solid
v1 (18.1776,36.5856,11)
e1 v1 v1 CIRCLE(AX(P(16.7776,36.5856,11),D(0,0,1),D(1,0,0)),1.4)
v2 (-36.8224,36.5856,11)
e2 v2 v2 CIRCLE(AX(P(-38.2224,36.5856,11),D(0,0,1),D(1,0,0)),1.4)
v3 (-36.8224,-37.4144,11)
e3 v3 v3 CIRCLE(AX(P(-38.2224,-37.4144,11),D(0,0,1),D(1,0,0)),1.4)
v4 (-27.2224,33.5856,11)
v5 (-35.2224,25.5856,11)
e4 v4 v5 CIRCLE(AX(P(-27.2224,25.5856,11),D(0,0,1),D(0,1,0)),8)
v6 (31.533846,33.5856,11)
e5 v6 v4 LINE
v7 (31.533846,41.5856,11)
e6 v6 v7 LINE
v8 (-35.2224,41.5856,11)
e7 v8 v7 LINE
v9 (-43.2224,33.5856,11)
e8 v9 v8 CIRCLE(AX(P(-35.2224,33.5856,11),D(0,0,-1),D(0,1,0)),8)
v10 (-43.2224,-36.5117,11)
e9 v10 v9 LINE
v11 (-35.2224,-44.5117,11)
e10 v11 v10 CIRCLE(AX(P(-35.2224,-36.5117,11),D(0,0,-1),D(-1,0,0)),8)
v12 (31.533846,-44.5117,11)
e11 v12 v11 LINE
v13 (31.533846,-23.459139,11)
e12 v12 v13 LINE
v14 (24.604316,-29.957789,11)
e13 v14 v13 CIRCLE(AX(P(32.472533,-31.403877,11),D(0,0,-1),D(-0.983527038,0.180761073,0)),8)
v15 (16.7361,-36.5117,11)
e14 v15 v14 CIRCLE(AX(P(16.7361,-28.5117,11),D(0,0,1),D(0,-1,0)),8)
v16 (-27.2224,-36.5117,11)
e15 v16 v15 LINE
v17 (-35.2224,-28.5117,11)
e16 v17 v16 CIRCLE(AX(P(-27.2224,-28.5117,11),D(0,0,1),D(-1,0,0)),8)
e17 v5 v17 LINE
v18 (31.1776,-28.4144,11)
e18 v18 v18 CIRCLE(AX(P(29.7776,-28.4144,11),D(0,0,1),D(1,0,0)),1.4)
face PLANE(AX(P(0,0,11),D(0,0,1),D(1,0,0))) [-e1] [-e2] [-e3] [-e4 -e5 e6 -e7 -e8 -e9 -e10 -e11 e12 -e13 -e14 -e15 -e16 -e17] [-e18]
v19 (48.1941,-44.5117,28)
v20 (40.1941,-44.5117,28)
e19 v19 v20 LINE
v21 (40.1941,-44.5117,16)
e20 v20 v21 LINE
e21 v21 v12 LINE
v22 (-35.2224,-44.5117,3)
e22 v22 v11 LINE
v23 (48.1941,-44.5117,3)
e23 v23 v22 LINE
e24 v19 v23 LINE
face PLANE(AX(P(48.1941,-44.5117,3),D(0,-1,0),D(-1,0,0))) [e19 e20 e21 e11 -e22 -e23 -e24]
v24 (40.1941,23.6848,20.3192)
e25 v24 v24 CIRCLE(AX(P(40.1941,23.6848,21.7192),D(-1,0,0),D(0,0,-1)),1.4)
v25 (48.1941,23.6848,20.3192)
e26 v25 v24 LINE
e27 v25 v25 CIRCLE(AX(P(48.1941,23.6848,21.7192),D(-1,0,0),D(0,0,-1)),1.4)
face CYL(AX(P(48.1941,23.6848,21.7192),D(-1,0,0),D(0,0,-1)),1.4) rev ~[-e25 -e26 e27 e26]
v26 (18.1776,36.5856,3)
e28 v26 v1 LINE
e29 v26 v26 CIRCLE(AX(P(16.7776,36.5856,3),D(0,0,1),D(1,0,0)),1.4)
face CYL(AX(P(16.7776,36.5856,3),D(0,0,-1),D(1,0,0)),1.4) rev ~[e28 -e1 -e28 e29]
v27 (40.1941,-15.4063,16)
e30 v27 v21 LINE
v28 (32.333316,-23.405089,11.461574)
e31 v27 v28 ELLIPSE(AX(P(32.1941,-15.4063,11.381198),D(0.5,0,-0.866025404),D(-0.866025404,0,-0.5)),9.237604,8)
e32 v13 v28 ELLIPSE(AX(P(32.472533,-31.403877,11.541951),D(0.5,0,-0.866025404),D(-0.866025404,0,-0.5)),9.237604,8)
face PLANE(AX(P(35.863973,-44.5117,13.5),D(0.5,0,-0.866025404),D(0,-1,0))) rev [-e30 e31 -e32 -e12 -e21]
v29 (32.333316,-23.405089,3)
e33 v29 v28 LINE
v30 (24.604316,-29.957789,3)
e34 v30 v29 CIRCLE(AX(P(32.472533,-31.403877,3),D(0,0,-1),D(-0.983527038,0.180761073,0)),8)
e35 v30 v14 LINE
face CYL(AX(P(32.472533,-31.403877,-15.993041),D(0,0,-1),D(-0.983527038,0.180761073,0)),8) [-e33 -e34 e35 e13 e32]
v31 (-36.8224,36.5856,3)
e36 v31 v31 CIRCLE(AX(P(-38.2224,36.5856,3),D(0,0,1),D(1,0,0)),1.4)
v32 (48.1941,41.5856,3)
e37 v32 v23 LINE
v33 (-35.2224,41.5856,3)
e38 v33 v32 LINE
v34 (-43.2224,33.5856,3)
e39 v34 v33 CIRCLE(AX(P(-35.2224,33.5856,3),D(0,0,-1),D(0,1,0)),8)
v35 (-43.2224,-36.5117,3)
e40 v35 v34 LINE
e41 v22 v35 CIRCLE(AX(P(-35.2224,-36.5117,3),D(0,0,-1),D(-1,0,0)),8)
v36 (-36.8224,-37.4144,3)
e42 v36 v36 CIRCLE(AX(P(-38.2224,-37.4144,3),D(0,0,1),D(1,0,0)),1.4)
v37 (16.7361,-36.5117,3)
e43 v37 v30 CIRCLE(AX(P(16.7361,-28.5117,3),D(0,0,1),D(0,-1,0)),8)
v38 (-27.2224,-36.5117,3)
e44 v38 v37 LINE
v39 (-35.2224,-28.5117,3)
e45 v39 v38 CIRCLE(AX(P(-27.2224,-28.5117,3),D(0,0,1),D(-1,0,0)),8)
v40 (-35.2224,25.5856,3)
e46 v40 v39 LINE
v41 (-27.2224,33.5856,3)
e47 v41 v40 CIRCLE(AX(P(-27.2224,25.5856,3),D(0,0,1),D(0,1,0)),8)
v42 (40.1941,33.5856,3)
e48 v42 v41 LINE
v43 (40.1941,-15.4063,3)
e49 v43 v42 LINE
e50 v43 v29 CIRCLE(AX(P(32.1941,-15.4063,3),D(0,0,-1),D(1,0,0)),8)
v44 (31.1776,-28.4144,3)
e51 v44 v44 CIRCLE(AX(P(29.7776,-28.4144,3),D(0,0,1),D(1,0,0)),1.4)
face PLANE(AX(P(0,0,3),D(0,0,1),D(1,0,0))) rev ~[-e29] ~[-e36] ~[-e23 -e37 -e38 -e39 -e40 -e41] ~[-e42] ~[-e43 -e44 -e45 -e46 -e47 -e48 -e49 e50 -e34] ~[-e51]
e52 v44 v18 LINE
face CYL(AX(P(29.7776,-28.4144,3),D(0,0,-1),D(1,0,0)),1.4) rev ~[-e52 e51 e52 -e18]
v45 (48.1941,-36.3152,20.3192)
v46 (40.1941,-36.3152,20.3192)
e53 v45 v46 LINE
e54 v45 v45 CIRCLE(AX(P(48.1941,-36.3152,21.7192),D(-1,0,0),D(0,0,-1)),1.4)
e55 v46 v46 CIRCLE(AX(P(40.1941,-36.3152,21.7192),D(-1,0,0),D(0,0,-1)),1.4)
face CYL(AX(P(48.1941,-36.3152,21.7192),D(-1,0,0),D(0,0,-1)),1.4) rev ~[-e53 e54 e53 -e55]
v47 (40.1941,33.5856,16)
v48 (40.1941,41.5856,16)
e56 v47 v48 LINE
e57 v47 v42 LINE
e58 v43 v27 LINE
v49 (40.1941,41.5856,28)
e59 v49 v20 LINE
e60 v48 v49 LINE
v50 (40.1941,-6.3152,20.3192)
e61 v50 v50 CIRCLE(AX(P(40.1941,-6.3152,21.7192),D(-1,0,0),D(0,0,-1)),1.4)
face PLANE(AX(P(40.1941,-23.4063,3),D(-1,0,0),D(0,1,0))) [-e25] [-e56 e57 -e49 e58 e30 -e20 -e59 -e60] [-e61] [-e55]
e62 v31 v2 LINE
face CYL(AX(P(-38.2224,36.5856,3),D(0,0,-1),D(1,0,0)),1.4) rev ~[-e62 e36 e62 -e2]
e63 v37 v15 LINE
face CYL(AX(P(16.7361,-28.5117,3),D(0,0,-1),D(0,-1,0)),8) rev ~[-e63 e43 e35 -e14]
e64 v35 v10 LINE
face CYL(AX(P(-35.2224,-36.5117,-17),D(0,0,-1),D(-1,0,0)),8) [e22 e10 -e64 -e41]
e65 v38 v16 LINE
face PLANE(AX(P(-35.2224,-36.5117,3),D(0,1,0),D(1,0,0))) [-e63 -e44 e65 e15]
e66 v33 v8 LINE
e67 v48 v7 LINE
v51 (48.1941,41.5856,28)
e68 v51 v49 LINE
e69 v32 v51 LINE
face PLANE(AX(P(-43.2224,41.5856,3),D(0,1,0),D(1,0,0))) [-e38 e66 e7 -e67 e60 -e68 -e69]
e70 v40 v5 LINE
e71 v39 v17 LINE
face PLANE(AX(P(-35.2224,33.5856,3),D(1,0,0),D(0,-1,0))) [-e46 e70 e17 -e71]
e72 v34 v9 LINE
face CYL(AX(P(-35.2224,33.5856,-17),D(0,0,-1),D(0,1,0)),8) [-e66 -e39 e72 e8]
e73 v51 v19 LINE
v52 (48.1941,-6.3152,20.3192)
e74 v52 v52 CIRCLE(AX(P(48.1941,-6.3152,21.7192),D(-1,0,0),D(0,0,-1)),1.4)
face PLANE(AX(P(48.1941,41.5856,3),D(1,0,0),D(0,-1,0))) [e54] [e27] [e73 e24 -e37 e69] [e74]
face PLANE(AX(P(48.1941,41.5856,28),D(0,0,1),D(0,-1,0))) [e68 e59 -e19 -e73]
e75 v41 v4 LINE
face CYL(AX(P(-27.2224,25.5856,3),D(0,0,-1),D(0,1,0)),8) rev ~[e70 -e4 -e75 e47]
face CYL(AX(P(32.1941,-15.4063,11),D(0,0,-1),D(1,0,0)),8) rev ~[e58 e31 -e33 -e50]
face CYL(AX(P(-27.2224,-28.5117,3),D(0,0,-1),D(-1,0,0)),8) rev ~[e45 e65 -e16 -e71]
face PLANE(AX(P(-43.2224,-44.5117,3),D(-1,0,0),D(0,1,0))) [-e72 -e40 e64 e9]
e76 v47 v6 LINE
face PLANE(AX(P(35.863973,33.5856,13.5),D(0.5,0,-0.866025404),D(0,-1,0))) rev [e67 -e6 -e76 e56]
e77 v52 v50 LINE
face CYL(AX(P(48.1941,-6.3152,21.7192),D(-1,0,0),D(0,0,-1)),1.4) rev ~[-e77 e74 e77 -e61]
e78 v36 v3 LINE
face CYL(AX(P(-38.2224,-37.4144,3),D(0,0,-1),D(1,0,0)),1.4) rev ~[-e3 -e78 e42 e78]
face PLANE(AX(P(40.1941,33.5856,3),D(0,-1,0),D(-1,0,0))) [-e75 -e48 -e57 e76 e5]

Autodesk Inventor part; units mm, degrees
ref_plane "YZ Plane" through (0, 0, 0) normal (1, 0, 0) x (0, 1, 0)
ref_plane "XZ Plane" through (0, 0, 0) normal (0, 1, 0) x (-1, 0, 0)
ref_plane "XY Plane" through (0, 0, 0) normal (0, 0, 1) x (1, 0, 0)
ref_plane "Arbeitsebene1" through (0, 0, 3) normal (0, 0, 1) x (1, 0, 0)
sketch "Skizze1" plane through (0, 0, 3) normal (0, 0, 1) x (1, 0, 0)
  line L0 (43.1941, -41.5994) -> (-43.1659, -41.5994) construction
  line L1 (43.1941, 41.5856) -> (43.1941, -41.5994) construction
  line L2 (-43.2224, 41.5856) -> (43.1941, 41.5856) construction
  line L3 (-43.1659, -41.5994) -> (-43.2224, 41.5856) construction
  circle A0 centre (37.6276, -35.8844) radius 0.5 construction
  circle A1 centre (35.0876, -35.8844) radius 0.5 construction
  circle A2 centre (32.5476, -35.8844) radius 0.5 construction
  circle A3 centre (36.8476, -29.7044) radius 0.5 construction
  circle A4 centre (25.8376, -35.8644) radius 0.5 construction
  circle A5 centre (23.2976, -35.8644) radius 0.5 construction
  circle A6 centre (20.7576, -35.8644) radius 0.5 construction
  circle A7 centre (36.8476, -27.1644) radius 0.5 construction
  circle A8 centre (36.8476, -24.6244) radius 0.5 construction
  circle A9 centre (29.7776, -28.4144) radius 1.6 construction
  circle A10 centre (36.8976, -19.8144) radius 0.5 construction
  circle A11 centre (29.8161, -22.9044) radius 0.5 construction
  circle A12 centre (27.2761, -22.9044) radius 0.5 construction
  circle A13 centre (24.7361, -22.9044) radius 0.5 construction
  circle A14 centre (22.1961, -22.9044) radius 0.5 construction
  circle A15 centre (19.6561, -22.9044) radius 0.5 construction
  circle A16 centre (13.8076, -35.7944) radius 0.5 construction
  circle A17 centre (11.2676, -35.7944) radius 0.5 construction
  circle A18 centre (8.7276, -35.7944) radius 0.5 construction
  circle A19 centre (1.7376, -35.7544) radius 0.5 construction
  circle A20 centre (-0.8024, -35.7544) radius 0.5 construction
  circle A21 centre (18.2361, -29.1444) radius 0.5 construction
  circle A22 centre (18.2361, -26.6044) radius 0.5 construction
  circle A23 centre (10.7361, -29.1444) radius 0.5 construction
  circle A24 centre (10.7361, -26.6044) radius 0.5 construction
  circle A25 centre (17.1161, -22.9044) radius 0.5 construction
  circle A26 centre (14.5761, -22.9044) radius 0.5 construction
  circle A27 centre (12.0361, -22.9044) radius 0.5 construction
  circle A28 centre (9.4961, -22.9044) radius 0.5 construction
  circle A29 centre (3.2361, -29.1444) radius 0.5 construction
  circle A30 centre (3.2361, -26.6044) radius 0.5 construction
  circle A31 centre (6.9561, -22.9044) radius 0.5 construction
  circle A32 centre (1.1961, -20.0044) radius 0.5 construction
  circle A33 centre (36.8976, -17.2744) radius 0.5 construction
  circle A34 centre (36.8976, -14.7344) radius 0.5 construction
  circle A35 centre (36.9476, -8.9644) radius 0.5 construction
  circle A36 centre (36.9476, -6.4244) radius 0.5 construction
  circle A37 centre (30.7111, -6.3544) radius 0.5 construction
  circle A38 centre (36.9476, -3.8844) radius 0.5 construction
  circle A39 centre (30.7111, -3.8144) radius 0.5 construction
  circle A40 centre (30.7111, -1.2744) radius 0.5 construction
  circle A41 centre (5.3111, -6.3544) radius 0.5 construction
  circle A42 centre (5.3111, -3.8144) radius 0.5 construction
  circle A43 centre (5.3111, -1.2744) radius 0.5 construction
  circle A44 centre (-3.3424, -35.7544) radius 0.5 construction
  circle A45 centre (-8.1789, -38.8044) radius 0.5 construction
  circle A46 centre (-8.1789, -35.1044) radius 0.5 construction
  circle A47 centre (-8.1789, -31.4044) radius 0.5 construction
  circle A48 centre (-10.7189, -38.8044) radius 0.5 construction
  circle A49 centre (-10.7189, -35.1044) radius 0.5 construction
  circle A50 centre (-14.5659, -33.6344) radius 0.5 construction
  circle A51 centre (-10.7189, -31.4044) radius 0.5 construction
  circle A52 centre (-17.1059, -33.6344) radius 0.5 construction
  circle A53 centre (-19.6459, -33.6344) radius 0.5 construction
  circle A54 centre (-1.3439, -27.2044) radius 0.5 construction
  circle A55 centre (-3.8839, -27.2044) radius 0.5 construction
  circle A56 centre (-6.4239, -27.2044) radius 0.5 construction
  circle A57 centre (-8.9639, -27.2044) radius 0.5 construction
  circle A58 centre (-1.3439, -23.6044) radius 0.5 construction
  circle A59 centre (-3.8839, -23.6044) radius 0.5 construction
  circle A60 centre (-1.3439, -20.0044) radius 0.5 construction
  circle A61 centre (-3.8839, -20.0044) radius 0.5 construction
  circle A62 centre (-6.4239, -23.6044) radius 0.5 construction
  circle A63 centre (-8.9639, -23.6044) radius 0.5 construction
  circle A64 centre (-6.4239, -20.0044) radius 0.5 construction
  circle A65 centre (-8.9639, -20.0044) radius 0.5 construction
  circle A66 centre (-14.5659, -20.9344) radius 0.5 construction
  circle A67 centre (-17.1059, -20.9344) radius 0.5 construction
  circle A68 centre (-19.6459, -20.9344) radius 0.5 construction
  circle A69 centre (-22.1859, -33.6344) radius 0.5 construction
  circle A70 centre (-24.7259, -33.6344) radius 0.5 construction
  circle A71 centre (-27.2659, -33.6344) radius 0.5 construction
  circle A72 centre (-29.8059, -33.6344) radius 0.5 construction
  circle A73 centre (-38.2224, -37.4144) radius 1.6 construction
  circle A74 centre (-32.3459, -33.6344) radius 0.5 construction
  circle A75 centre (-38.3399, -30.1694) radius 0.5 construction
  circle A76 centre (-22.1859, -20.9344) radius 0.5 construction
  circle A77 centre (-24.7259, -20.9344) radius 0.5 construction
  circle A78 centre (-27.2659, -20.9344) radius 0.5 construction
  circle A79 centre (-29.8059, -20.9344) radius 0.5 construction
  circle A80 centre (-38.3399, -27.6294) radius 0.5 construction
  circle A81 centre (-38.3399, -25.0894) radius 0.5 construction
  circle A82 centre (-32.3459, -20.9344) radius 0.5 construction
  circle A83 centre (-38.3399, -22.5494) radius 0.5 construction
  circle A84 centre (-2.2639, -15.2044) radius 0.375 construction
  circle A85 centre (-4.2639, -15.2044) radius 0.375 construction
  circle A86 centre (-6.2639, -15.2044) radius 0.375 construction
  circle A87 centre (-8.2639, -15.2044) radius 0.375 construction
  circle A88 centre (-2.2639, -9.7044) radius 0.375 construction
  circle A89 centre (-4.2639, -9.7044) radius 0.375 construction
  circle A90 centre (-6.2639, -9.7044) radius 0.375 construction
  circle A91 centre (-8.2639, -9.7044) radius 0.375 construction
  circle A92 centre (-14.5659, -15.6344) radius 0.5 construction
  circle A93 centre (-17.1059, -15.6344) radius 0.5 construction
  circle A94 centre (-19.6459, -15.6344) radius 0.5 construction
  circle A95 centre (-2.2639, -4.2044) radius 0.375 construction
  circle A96 centre (-4.2639, -4.2044) radius 0.375 construction
  circle A97 centre (-6.2639, -4.2044) radius 0.375 construction
  circle A98 centre (-8.2639, -4.2044) radius 0.375 construction
  circle A99 centre (-14.5659, -2.9344) radius 0.5 construction
  circle A100 centre (-17.1059, -2.9344) radius 0.5 construction
  circle A101 centre (-19.6459, -2.9344) radius 0.5 construction
  circle A102 centre (-22.1859, -15.6344) radius 0.5 construction
  circle A103 centre (-24.7259, -15.6344) radius 0.5 construction
  circle A104 centre (-27.2659, -15.6344) radius 0.5 construction
  circle A105 centre (-29.8059, -15.6344) radius 0.5 construction
  circle A106 centre (-32.3459, -15.6344) radius 0.5 construction
  circle A107 centre (-38.4669, -13.2784) radius 0.5 construction
  circle A108 centre (-38.4669, -10.7384) radius 0.5 construction
  circle A109 centre (-22.1859, -2.9344) radius 0.5 construction
  circle A110 centre (-24.7259, -2.9344) radius 0.5 construction
  circle A111 centre (-27.2659, -2.9344) radius 0.5 construction
  circle A112 centre (-29.8059, -2.9344) radius 0.5 construction
  circle A113 centre (-38.4669, -8.1984) radius 0.5 construction
  circle A114 centre (-38.4669, -5.6584) radius 0.5 construction
  circle A115 centre (-32.3459, -2.9344) radius 0.5 construction
  circle A116 centre (36.9476, 0.6556) radius 0.5 construction
  circle A117 centre (36.9476, 3.1956) radius 0.5 construction
  circle A118 centre (30.7111, 1.2656) radius 0.5 construction
  circle A119 centre (30.7111, 3.8056) radius 0.5 construction
  circle A120 centre (36.9476, 5.7356) radius 0.5 construction
  circle A121 centre (30.7111, 6.3456) radius 0.5 construction
  circle A122 centre (30.7111, 8.8856) radius 0.5 construction
  circle A123 centre (36.9976, 10.7656) radius 0.5 construction
  circle A124 centre (36.9976, 13.3056) radius 0.5 construction
  circle A125 centre (30.7111, 11.4256) radius 0.5 construction
  circle A126 centre (30.7111, 13.9656) radius 0.5 construction
  circle A127 centre (36.9976, 15.8456) radius 0.5 construction
  circle A128 centre (30.7111, 16.5056) radius 0.5 construction
  circle A129 centre (30.7111, 19.0456) radius 0.5 construction
  circle A130 centre (5.3111, 1.2656) radius 0.5 construction
  circle A131 centre (5.3111, 3.8056) radius 0.5 construction
  circle A132 centre (5.3111, 6.3456) radius 0.5 construction
  circle A133 centre (5.3111, 8.8856) radius 0.5 construction
  circle A134 centre (5.3111, 11.4256) radius 0.5 construction
  circle A135 centre (5.3111, 13.9656) radius 0.5 construction
  circle A136 centre (5.3111, 16.5056) radius 0.5 construction
  circle A137 centre (5.3111, 19.0456) radius 0.5 construction
  circle A138 centre (36.9476, 20.9456) radius 0.5 construction
  circle A139 centre (36.9476, 23.4856) radius 0.5 construction
  circle A140 centre (30.7111, 21.5856) radius 0.5 construction
  circle A141 centre (30.7111, 24.1256) radius 0.5 construction
  circle A142 centre (36.9476, 26.0256) radius 0.5 construction
  circle A143 centre (30.7111, 26.6656) radius 0.5 construction
  circle A144 centre (30.7111, 29.2056) radius 0.5 construction
  circle A145 centre (30.7111, 31.7456) radius 0.5 construction
  circle A146 centre (30.7111, 34.2856) radius 0.5 construction
  circle A147 centre (30.7111, 36.8256) radius 0.5 construction
  circle A148 centre (30.7111, 39.3656) radius 0.5 construction
  circle A149 centre (5.3111, 21.5856) radius 0.5 construction
  circle A150 centre (5.3111, 24.1256) radius 0.5 construction
  circle A151 centre (5.3111, 26.6656) radius 0.5 construction
  circle A152 centre (5.3111, 29.2056) radius 0.5 construction
  circle A153 centre (16.7776, 36.5856) radius 1.6 construction
  circle A154 centre (5.3111, 31.7456) radius 0.5 construction
  circle A155 centre (5.3111, 34.2856) radius 0.5 construction
  circle A156 centre (5.3111, 36.8256) radius 0.5 construction
  circle A157 centre (5.3111, 39.3656) radius 0.5 construction
  circle A158 centre (-14.5659, 2.3656) radius 0.5 construction
  circle A159 centre (-17.1059, 2.3656) radius 0.5 construction
  circle A160 centre (-19.6459, 2.3656) radius 0.5 construction
  circle A161 centre (-14.5659, 15.0656) radius 0.5 construction
  circle A162 centre (-17.1059, 15.0656) radius 0.5 construction
  circle A163 centre (-19.6459, 15.0656) radius 0.5 construction
  circle A164 centre (-14.5659, 20.0656) radius 0.5 construction
  circle A165 centre (-17.1059, 20.0656) radius 0.5 construction
  circle A166 centre (-19.6459, 20.0656) radius 0.5 construction
  circle A167 centre (-22.1859, 2.3656) radius 0.5 construction
  circle A168 centre (-24.7259, 2.3656) radius 0.5 construction
  circle A169 centre (-27.2659, 2.3656) radius 0.5 construction
  circle A170 centre (-29.8059, 2.3656) radius 0.5 construction
  circle A171 centre (-32.3459, 2.3656) radius 0.5 construction
  circle A172 centre (-38.4669, 4.8826) radius 0.5 construction
  circle A173 centre (-38.4669, 7.4226) radius 0.5 construction
  circle A174 centre (-38.4669, 9.9626) radius 0.5 construction
  circle A175 centre (-22.1859, 15.0656) radius 0.5 construction
  circle A176 centre (-24.7259, 15.0656) radius 0.5 construction
  circle A177 centre (-27.2659, 15.0656) radius 0.5 construction
  circle A178 centre (-29.8059, 15.0656) radius 0.5 construction
  circle A179 centre (-22.1859, 20.0656) radius 0.5 construction
  circle A180 centre (-24.7259, 20.0656) radius 0.5 construction
  circle A181 centre (-27.2659, 20.0656) radius 0.5 construction
  circle A182 centre (-29.8059, 20.0656) radius 0.5 construction
  circle A183 centre (-32.3459, 15.0656) radius 0.5 construction
  circle A184 centre (-38.4669, 12.5026) radius 0.5 construction
  circle A185 centre (-32.3459, 20.0656) radius 0.5 construction
  line L4 (-0.223, 29.8753) -> (-0.0936, 29.8162) construction
  line L5 (-0.0936, 29.8162) -> (0.014, 29.723) construction
  line L6 (0.014, 29.723) -> (0.0909, 29.6033) construction
  line L7 (0.0909, 29.6033) -> (0.131, 29.4667) construction
  line L8 (0.131, 29.4667) -> (0.131, 29.3244) construction
  line L9 (0.131, 29.3244) -> (0.0909, 29.1879) construction
  line L10 (0.0909, 29.1879) -> (0.014, 29.0681) construction
  line L11 (0.014, 29.0681) -> (-0.0936, 28.9749) construction
  line L12 (-0.0936, 28.9749) -> (-0.223, 28.9158) construction
  line L13 (-0.223, 28.9158) -> (-0.3639, 28.8956) construction
  line L14 (-0.3639, 28.8956) -> (-2.9639, 28.8956) construction
  line L15 (-2.9639, 28.8956) -> (-3.1047, 28.9158) construction
  line L16 (-3.1047, 28.9158) -> (-3.2342, 28.9749) construction
  line L17 (-3.2342, 28.9749) -> (-3.3417, 29.0681) construction
  line L18 (-3.3417, 29.0681) -> (-3.4187, 29.1879) construction
  line L19 (-3.4187, 29.1879) -> (-3.4588, 29.3244) construction
  line L20 (-3.4588, 29.3244) -> (-3.4588, 29.4667) construction
  line L21 (-3.4588, 29.4667) -> (-3.4187, 29.6033) construction
  line L22 (-3.4187, 29.6033) -> (-3.3417, 29.723) construction
  line L23 (-3.3417, 29.723) -> (-3.2342, 29.8162) construction
  line L24 (-3.2342, 29.8162) -> (-3.1047, 29.8753) construction
  line L25 (-3.1047, 29.8753) -> (-2.9639, 29.8956) construction
  line L26 (-2.9639, 29.8956) -> (-0.3639, 29.8956) construction
  line L27 (-0.3639, 29.8956) -> (-0.223, 29.8753) construction
  line L28 (-6.9436, 33.5364) -> (-6.8845, 33.6659) construction
  line L29 (-6.8845, 33.6659) -> (-6.7913, 33.7734) construction
  line L30 (-6.7913, 33.7734) -> (-6.6716, 33.8504) construction
  line L31 (-6.6716, 33.8504) -> (-6.535, 33.8905) construction
  line L32 (-6.535, 33.8905) -> (-6.3927, 33.8905) construction
  line L33 (-6.3927, 33.8905) -> (-6.2562, 33.8504) construction
  line L34 (-6.2562, 33.8504) -> (-6.1364, 33.7734) construction
  line L35 (-6.1364, 33.7734) -> (-6.0432, 33.6659) construction
  line L36 (-6.0432, 33.6659) -> (-5.9841, 33.5364) construction
  line L37 (-5.9841, 33.5364) -> (-5.9639, 33.3956) construction
  line L38 (-5.9639, 33.3956) -> (-5.9639, 31.1956) construction
  line L39 (-5.9639, 31.1956) -> (-5.9841, 31.0547) construction
  line L40 (-5.9841, 31.0547) -> (-6.0432, 30.9253) construction
  line L41 (-6.0432, 30.9253) -> (-6.1364, 30.8177) construction
  line L42 (-6.1364, 30.8177) -> (-6.2562, 30.7408) construction
  line L43 (-6.2562, 30.7408) -> (-6.3927, 30.7007) construction
  line L44 (-6.3927, 30.7007) -> (-6.535, 30.7007) construction
  line L45 (-6.535, 30.7007) -> (-6.6716, 30.7408) construction
  line L46 (-6.6716, 30.7408) -> (-6.7913, 30.8177) construction
  line L47 (-6.7913, 30.8177) -> (-6.8845, 30.9253) construction
  line L48 (-6.8845, 30.9253) -> (-6.9436, 31.0547) construction
  line L49 (-6.9436, 31.0547) -> (-6.9639, 31.1956) construction
  line L50 (-6.9639, 31.1956) -> (-6.9639, 33.3956) construction
  line L51 (-6.9639, 33.3956) -> (-6.9436, 33.5364) construction
  line L52 (-0.423, 36.1753) -> (-0.2936, 36.1162) construction
  line L53 (-0.2936, 36.1162) -> (-0.186, 36.023) construction
  line L54 (-0.186, 36.023) -> (-0.1091, 35.9033) construction
  line L55 (-0.1091, 35.9033) -> (-0.069, 35.7667) construction
  line L56 (-0.069, 35.7667) -> (-0.069, 35.6244) construction
  line L57 (-0.069, 35.6244) -> (-0.1091, 35.4879) construction
  line L58 (-0.1091, 35.4879) -> (-0.186, 35.3681) construction
  line L59 (-0.186, 35.3681) -> (-0.2936, 35.2749) construction
  line L60 (-0.2936, 35.2749) -> (-0.423, 35.2158) construction
  line L61 (-0.423, 35.2158) -> (-0.5639, 35.1956) construction
  line L62 (-0.5639, 35.1956) -> (-2.7639, 35.1956) construction
  line L63 (-2.7639, 35.1956) -> (-2.9047, 35.2158) construction
  line L64 (-2.9047, 35.2158) -> (-3.0342, 35.2749) construction
  line L65 (-3.0342, 35.2749) -> (-3.1417, 35.3681) construction
  line L66 (-3.1417, 35.3681) -> (-3.2187, 35.4879) construction
  line L67 (-3.2187, 35.4879) -> (-3.2588, 35.6244) construction
  line L68 (-3.2588, 35.6244) -> (-3.2588, 35.7667) construction
  line L69 (-3.2588, 35.7667) -> (-3.2187, 35.9033) construction
  line L70 (-3.2187, 35.9033) -> (-3.1417, 36.023) construction
  line L71 (-3.1417, 36.023) -> (-3.0342, 36.1162) construction
  line L72 (-3.0342, 36.1162) -> (-2.9047, 36.1753) construction
  line L73 (-2.9047, 36.1753) -> (-2.7639, 36.1956) construction
  line L74 (-2.7639, 36.1956) -> (-0.5639, 36.1956) construction
  line L75 (-0.5639, 36.1956) -> (-0.423, 36.1753) construction
  circle A186 centre (-14.5659, 32.7656) radius 0.5 construction
  circle A187 centre (-17.1059, 32.7656) radius 0.5 construction
  circle A188 centre (-19.6459, 32.7656) radius 0.5 construction
  circle A189 centre (-38.4669, 22.1546) radius 0.5 construction
  circle A190 centre (-38.4669, 24.6946) radius 0.5 construction
  circle A191 centre (-38.4669, 27.2346) radius 0.5 construction
  circle A192 centre (-38.4669, 29.7746) radius 0.5 construction
  circle A193 centre (-22.1859, 32.7656) radius 0.5 construction
  circle A194 centre (-24.7259, 32.7656) radius 0.5 construction
  circle A195 centre (-27.2659, 32.7656) radius 0.5 construction
  circle A196 centre (-29.8059, 32.7656) radius 0.5 construction
  circle A197 centre (-32.3459, 32.7656) radius 0.5 construction
  circle A198 centre (-38.2224, 36.5856) radius 1.6 construction
  line L76 (48.1941, 113.9931) -> (48.1941, -93.0069) projected
  line L77 (-43.2224, 41.5856) -> (48.1941, 41.5856)
  line L78 (48.1941, 41.5856) -> (48.1941, -44.5117)
  line L79 (48.1941, -44.5117) -> (-43.2224, -44.5117)
  line L80 (-43.2224, -44.5117) -> (-43.2224, 41.5856)
  line L81 (-35.2224, -36.5117) -> (40.1941, -36.5117)
  line L82 (40.1941, -36.5117) -> (40.1941, 33.5856)
  line L83 (40.1941, 33.5856) -> (-35.2224, 33.5856)
  line L84 (-35.2224, 33.5856) -> (-35.2224, -36.5117)
  line L85 (24.7361, -36.5117) -> (40.1941, -36.5117)
  line L86 (40.1941, -36.5117) -> (40.1941, -23.4063)
  line L87 (40.1941, -23.4063) -> (24.7361, -23.4063)
  line L88 (24.7361, -23.4063) -> (24.7361, -36.5117)
  circle A199 centre (-38.2224, -37.4144) radius 1.4
  circle A200 centre (29.7776, -28.4144) radius 1.4
  circle A201 centre (16.7776, 36.5856) radius 1.4
  circle A202 centre (-38.2224, 36.5856) radius 1.4
  point P0 (0, 0)
  point P1 (48.1941, 41.5856)
  dimension "d0" = 8
  dimension "d1" = 2.8
  dimension "d2" = 2.8
  dimension "d3" = 2.8
  dimension "d4" = 2.8
extrude "Extrusion1" add sketch "Skizze1" along normal blind 8 contours L76 L79 L80 L77 | L88 L87 L82 L81
sketch "Skizze2" plane through (48.1941, -44.5117, 3) normal (1, 0, 0) x (0, 0, -1)
  line L0 (0, 86.0973) -> (-8, 86.0973) projected
  line L1 (0, 0) -> (-8, 0) projected
  line L2 (-41.7258, 75.9615) -> (-41.7258, 34.048) projected
  line L3 (-41.7258, 34.048) -> (-71.8357, 34.048) projected
  line L4 (-71.8357, 34.048) -> (-71.8357, 75.9615) projected
  line L5 (-71.8357, 75.9615) -> (-41.7258, 75.9615) projected
  circle A0 centre (-115.652, -48.4952) radius 1.4 projected
  line L6 (-115.652, 173.3302) -> (33.348, 173.3302) projected
  arc A1 (-115.652, 173.3302) -> (-130.4774, 158.5048) centre (-115.652, 158.5048) ccw projected
  line L7 (-130.4774, -48.4952) -> (-130.4774, 158.5048) projected
  arc A2 (-130.4774, -48.4952) -> (-115.652, -63.3207) centre (-115.652, -48.4952) ccw projected
  line L8 (33.348, -63.3207) -> (-115.652, -63.3207) projected
  arc A3 (33.348, -63.3207) -> (48.1735, -48.4952) centre (33.348, -48.4952) ccw projected
  line L9 (48.1735, -40.6698) -> (48.1735, -48.4952) projected
  line L10 (41.848, -40.6698) -> (48.1735, -40.6698) projected
  arc A4 (26.6735, -25.4952) -> (41.848, -40.6698) centre (41.848, -25.4952) ccw projected
  line L11 (26.6735, -16.0952) -> (26.6735, -25.4952) projected
  arc A5 (41.848, -0.9207) -> (26.6735, -16.0952) centre (41.848, -16.0952) ccw projected
  line L12 (48.1735, -0.9207) -> (41.848, -0.9207) projected
  line L13 (48.1735, 158.5048) -> (48.1735, -0.9207) projected
  arc A6 (48.1735, 158.5048) -> (33.348, 173.3302) centre (33.348, 158.5048) ccw projected
  line L14 (-8, 0) -> (-8, 86.0973) projected
  line L15 (-8, 86.0973) -> (-25, 86.0973)
  line L16 (-25, 86.0973) -> (-25, 0)
  line L17 (-25, 0) -> (-8, 0)
  line L18 (-8, 0) -> (-8, 86.0973)
  line L19 (-91.152, -21.4995) -> (8.848, -21.4995) projected
  arc A7 (8.848, -41.4995) -> (8.848, -21.4995) centre (8.848, -31.4995) ccw projected
  line L20 (8.848, -41.4995) -> (-91.152, -41.4995) projected
  arc A8 (-91.152, -21.4995) -> (-91.152, -41.4995) centre (-91.152, -31.4995) ccw projected
  line L21 (-91.152, 150.8178) -> (8.848, 150.8178) projected
  arc A9 (8.848, 130.8178) -> (8.848, 150.8178) centre (8.848, 140.8178) ccw projected
  line L22 (-20.6404, 130.8178) -> (-91.152, 130.8178) projected
  arc A10 (-91.152, 150.8178) -> (-91.152, 130.8178) centre (-91.152, 140.8178) ccw projected
  arc A11 (-20.6404, 130.8178) -> (-16.798, 130.8178) centre (-18.7192, 128.1964) ccw projected
  line L23 (8.848, 130.8178) -> (-16.798, 130.8178) projected
  circle A12 centre (-69.852, 157.3428) radius 3.25 projected
  arc A13 (-21.4197, 100.0048) -> (-16.0187, 100.0048) centre (-18.7192, 98.1964) ccw projected
  arc A14 (-16.0187, 100.0048) -> (-21.4197, 100.0048) centre (-18.7192, 101.8131) ccw projected
  arc A15 (-21.4197, 70.0048) -> (-16.0187, 70.0048) centre (-18.7192, 68.1964) ccw projected
  arc A16 (-16.0187, 70.0048) -> (-21.4197, 70.0048) centre (-18.7192, 71.8131) ccw projected
  arc A17 (-21.4197, 40.0048) -> (-16.0187, 40.0048) centre (-18.7192, 38.1964) ccw projected
  arc A18 (-16.0187, 40.0048) -> (-21.4197, 40.0048) centre (-18.7192, 41.8131) ccw projected
  arc A19 (-21.4197, 10.0048) -> (-16.0187, 10.0048) centre (-18.7192, 8.1964) ccw projected
  arc A20 (-16.0187, 10.0048) -> (-21.4197, 10.0048) centre (-18.7192, 11.8131) ccw projected
  circle A21 centre (-54.852, 157.3428) radius 3.25 projected
  circle A22 centre (-39.852, 157.3428) radius 3.25 projected
  circle A23 centre (-33.552, -2.4952) radius 3.25 projected
  circle A24 centre (-48.3, -2.4952) radius 3.25 projected
  circle A25 centre (-61.4039, -2.4952) radius 3.25 projected
  circle A26 centre (-76.152, -2.4952) radius 3.25 projected
  circle A27 centre (-18.7192, -18.1869) radius 3.25 projected
  circle A28 centre (33.348, -48.4952) radius 3.25 projected
  circle A29 centre (-39.852, -47.3333) radius 3.25 projected
  circle A30 centre (-54.852, -47.3333) radius 3.25 projected
  circle A31 centre (-69.852, -47.3333) radius 3.25 projected
  circle A32 centre (33.348, 158.5048) radius 3.25 projected
  circle A33 centre (-115.652, 158.5048) radius 3.25 projected
  circle A34 centre (-32, 113.5048) radius 3.25 projected
  circle A35 centre (-49.852, 113.5048) radius 3.25 projected
  circle A36 centre (-59.852, 113.5048) radius 3.25 projected
  circle A37 centre (-77.7039, 113.5048) radius 3.25 projected
  circle A38 centre (-120.652, 163.5048) radius 1.4 projected
  circle A39 centre (38.348, 163.5048) radius 1.4 projected
  circle A40 centre (-120.652, -53.4952) radius 1.4 projected
  circle A41 centre (38.348, -53.4952) radius 1.4 projected
  point P0 (3, 44.5117)
  dimension "d7" = 17
extrude "Extrusion2" add sketch "Skizze2" against normal up to surface (8 mm away) contours L17 L16 L15 L14 | A16 A15 | A18 A17 | A20 A19
chamfer "Fasen1" distance 5 angle 60 2 edges at (40.1941, 37.5856, 11) (40.1941, -33.959, 11) measured on face at (40.1941, -8.7775, 22.3333)
fillet "Rundung1" radius 8 8 edges at (-43.2224, 41.5856, 7) (-43.2224, -44.5117, 7) (-35.2224, -36.5117, 7) (-35.2224, 33.5856, 7) (24.7361, -36.5117, 7) (24.7361, -23.4063, 7) (40.1941, -23.4063, 13.5) (40.1941, -23.4063, 7)
sketch "Skizze3" plane through (48.1941, -44.5117, 3) normal (1, 0, 0) x (0, 0, -1)
  line L0 (-115.652, 173.3302) -> (33.348, 173.3302) projected
  arc A0 (-115.652, 173.3302) -> (-130.4774, 158.5048) centre (-115.652, 158.5048) ccw projected
  line L1 (-130.4774, -48.4952) -> (-130.4774, 158.5048) projected
  arc A1 (-130.4774, -48.4952) -> (-115.652, -63.3207) centre (-115.652, -48.4952) ccw projected
  line L2 (33.348, -63.3207) -> (-115.652, -63.3207) projected
  arc A2 (33.348, -63.3207) -> (48.1735, -48.4952) centre (33.348, -48.4952) ccw projected
  line L3 (48.1735, -40.6698) -> (48.1735, -48.4952) projected
  line L4 (41.848, -40.6698) -> (48.1735, -40.6698) projected
  arc A3 (26.6735, -25.4952) -> (41.848, -40.6698) centre (41.848, -25.4952) ccw projected
  line L5 (26.6735, -16.0952) -> (26.6735, -25.4952) projected
  arc A4 (41.848, -0.9207) -> (26.6735, -16.0952) centre (41.848, -16.0952) ccw projected
  line L6 (48.1735, -0.9207) -> (41.848, -0.9207) projected
  line L7 (48.1735, 158.5048) -> (48.1735, -0.9207) projected
  arc A5 (48.1735, 158.5048) -> (33.348, 173.3302) centre (33.348, 158.5048) ccw projected
  circle A6 centre (-115.652, -48.4952) radius 1.4 projected
  circle A7 centre (-120.652, 163.5048) radius 1.4 projected
  circle A8 centre (38.348, 163.5048) radius 1.4 projected
  circle A9 centre (-120.652, -53.4952) radius 1.4 projected
  circle A10 centre (38.348, -53.4952) radius 1.4 projected
  line L8 (-41.7258, 75.9615) -> (-41.7258, 34.048) projected
  line L9 (-41.7258, 34.048) -> (-71.8357, 34.048) projected
  line L10 (-71.8357, 34.048) -> (-71.8357, 75.9615) projected
  line L11 (-71.8357, 75.9615) -> (-41.7258, 75.9615) projected
  arc A11 (-20.6404, 130.8178) -> (-16.798, 130.8178) centre (-18.7192, 128.1964) ccw projected
  line L12 (-20.6404, 130.8178) -> (-91.152, 130.8178) projected
  arc A12 (-91.152, 150.8178) -> (-91.152, 130.8178) centre (-91.152, 140.8178) ccw projected
  line L13 (-91.152, 150.8178) -> (8.848, 150.8178) projected
  arc A13 (8.848, 130.8178) -> (8.848, 150.8178) centre (8.848, 140.8178) ccw projected
  line L14 (8.848, 130.8178) -> (-16.798, 130.8178) projected
  line L15 (-91.152, -21.4995) -> (8.848, -21.4995) projected
  arc A14 (8.848, -41.4995) -> (8.848, -21.4995) centre (8.848, -31.4995) ccw projected
  line L16 (8.848, -41.4995) -> (-91.152, -41.4995) projected
  arc A15 (-91.152, -21.4995) -> (-91.152, -41.4995) centre (-91.152, -31.4995) ccw projected
  circle A16 centre (-69.852, 157.3428) radius 3.25 projected
  arc A17 (-21.4197, 100.0048) -> (-16.0187, 100.0048) centre (-18.7192, 98.1964) ccw projected
  arc A18 (-16.0187, 100.0048) -> (-21.4197, 100.0048) centre (-18.7192, 101.8131) ccw projected
  arc A19 (-21.4197, 70.0048) -> (-16.0187, 70.0048) centre (-18.7192, 68.1964) ccw projected
  arc A20 (-16.0187, 70.0048) -> (-21.4197, 70.0048) centre (-18.7192, 71.8131) ccw projected
  arc A21 (-21.4197, 40.0048) -> (-16.0187, 40.0048) centre (-18.7192, 38.1964) ccw projected
  arc A22 (-16.0187, 40.0048) -> (-21.4197, 40.0048) centre (-18.7192, 41.8131) ccw projected
  arc A23 (-21.4197, 10.0048) -> (-16.0187, 10.0048) centre (-18.7192, 8.1964) ccw projected
  arc A24 (-16.0187, 10.0048) -> (-21.4197, 10.0048) centre (-18.7192, 11.8131) ccw projected
  circle A25 centre (-54.852, 157.3428) radius 3.25 projected
  circle A26 centre (-39.852, 157.3428) radius 3.25 projected
  circle A27 centre (-33.552, -2.4952) radius 3.25 projected
  circle A28 centre (-48.3, -2.4952) radius 3.25 projected
  circle A29 centre (-61.4039, -2.4952) radius 3.25 projected
  circle A30 centre (-76.152, -2.4952) radius 3.25 projected
  circle A31 centre (-18.7192, -18.1869) radius 3.25 projected
  circle A32 centre (33.348, -48.4952) radius 3.25 projected
  circle A33 centre (-39.852, -47.3333) radius 3.25 projected
  circle A34 centre (-54.852, -47.3333) radius 3.25 projected
  circle A35 centre (-69.852, -47.3333) radius 3.25 projected
  circle A36 centre (33.348, 158.5048) radius 3.25 projected
  circle A37 centre (-115.652, 158.5048) radius 3.25 projected
  circle A38 centre (-32, 113.5048) radius 3.25 projected
  circle A39 centre (-49.852, 113.5048) radius 3.25 projected
  circle A40 centre (-59.852, 113.5048) radius 3.25 projected
  circle A41 centre (-77.7039, 113.5048) radius 3.25 projected
  point P0 (3, 44.5117)
hole "Bohrung1" at (48.1941, 23.6848, 21.7192) at (48.1941, -6.3152, 21.7192) at (48.1941, -36.3152, 21.7192) direction (-1, 0, 0) diameter 2.8 depth 20
properties part number "60_Planktoscope_Electronicsholder"
